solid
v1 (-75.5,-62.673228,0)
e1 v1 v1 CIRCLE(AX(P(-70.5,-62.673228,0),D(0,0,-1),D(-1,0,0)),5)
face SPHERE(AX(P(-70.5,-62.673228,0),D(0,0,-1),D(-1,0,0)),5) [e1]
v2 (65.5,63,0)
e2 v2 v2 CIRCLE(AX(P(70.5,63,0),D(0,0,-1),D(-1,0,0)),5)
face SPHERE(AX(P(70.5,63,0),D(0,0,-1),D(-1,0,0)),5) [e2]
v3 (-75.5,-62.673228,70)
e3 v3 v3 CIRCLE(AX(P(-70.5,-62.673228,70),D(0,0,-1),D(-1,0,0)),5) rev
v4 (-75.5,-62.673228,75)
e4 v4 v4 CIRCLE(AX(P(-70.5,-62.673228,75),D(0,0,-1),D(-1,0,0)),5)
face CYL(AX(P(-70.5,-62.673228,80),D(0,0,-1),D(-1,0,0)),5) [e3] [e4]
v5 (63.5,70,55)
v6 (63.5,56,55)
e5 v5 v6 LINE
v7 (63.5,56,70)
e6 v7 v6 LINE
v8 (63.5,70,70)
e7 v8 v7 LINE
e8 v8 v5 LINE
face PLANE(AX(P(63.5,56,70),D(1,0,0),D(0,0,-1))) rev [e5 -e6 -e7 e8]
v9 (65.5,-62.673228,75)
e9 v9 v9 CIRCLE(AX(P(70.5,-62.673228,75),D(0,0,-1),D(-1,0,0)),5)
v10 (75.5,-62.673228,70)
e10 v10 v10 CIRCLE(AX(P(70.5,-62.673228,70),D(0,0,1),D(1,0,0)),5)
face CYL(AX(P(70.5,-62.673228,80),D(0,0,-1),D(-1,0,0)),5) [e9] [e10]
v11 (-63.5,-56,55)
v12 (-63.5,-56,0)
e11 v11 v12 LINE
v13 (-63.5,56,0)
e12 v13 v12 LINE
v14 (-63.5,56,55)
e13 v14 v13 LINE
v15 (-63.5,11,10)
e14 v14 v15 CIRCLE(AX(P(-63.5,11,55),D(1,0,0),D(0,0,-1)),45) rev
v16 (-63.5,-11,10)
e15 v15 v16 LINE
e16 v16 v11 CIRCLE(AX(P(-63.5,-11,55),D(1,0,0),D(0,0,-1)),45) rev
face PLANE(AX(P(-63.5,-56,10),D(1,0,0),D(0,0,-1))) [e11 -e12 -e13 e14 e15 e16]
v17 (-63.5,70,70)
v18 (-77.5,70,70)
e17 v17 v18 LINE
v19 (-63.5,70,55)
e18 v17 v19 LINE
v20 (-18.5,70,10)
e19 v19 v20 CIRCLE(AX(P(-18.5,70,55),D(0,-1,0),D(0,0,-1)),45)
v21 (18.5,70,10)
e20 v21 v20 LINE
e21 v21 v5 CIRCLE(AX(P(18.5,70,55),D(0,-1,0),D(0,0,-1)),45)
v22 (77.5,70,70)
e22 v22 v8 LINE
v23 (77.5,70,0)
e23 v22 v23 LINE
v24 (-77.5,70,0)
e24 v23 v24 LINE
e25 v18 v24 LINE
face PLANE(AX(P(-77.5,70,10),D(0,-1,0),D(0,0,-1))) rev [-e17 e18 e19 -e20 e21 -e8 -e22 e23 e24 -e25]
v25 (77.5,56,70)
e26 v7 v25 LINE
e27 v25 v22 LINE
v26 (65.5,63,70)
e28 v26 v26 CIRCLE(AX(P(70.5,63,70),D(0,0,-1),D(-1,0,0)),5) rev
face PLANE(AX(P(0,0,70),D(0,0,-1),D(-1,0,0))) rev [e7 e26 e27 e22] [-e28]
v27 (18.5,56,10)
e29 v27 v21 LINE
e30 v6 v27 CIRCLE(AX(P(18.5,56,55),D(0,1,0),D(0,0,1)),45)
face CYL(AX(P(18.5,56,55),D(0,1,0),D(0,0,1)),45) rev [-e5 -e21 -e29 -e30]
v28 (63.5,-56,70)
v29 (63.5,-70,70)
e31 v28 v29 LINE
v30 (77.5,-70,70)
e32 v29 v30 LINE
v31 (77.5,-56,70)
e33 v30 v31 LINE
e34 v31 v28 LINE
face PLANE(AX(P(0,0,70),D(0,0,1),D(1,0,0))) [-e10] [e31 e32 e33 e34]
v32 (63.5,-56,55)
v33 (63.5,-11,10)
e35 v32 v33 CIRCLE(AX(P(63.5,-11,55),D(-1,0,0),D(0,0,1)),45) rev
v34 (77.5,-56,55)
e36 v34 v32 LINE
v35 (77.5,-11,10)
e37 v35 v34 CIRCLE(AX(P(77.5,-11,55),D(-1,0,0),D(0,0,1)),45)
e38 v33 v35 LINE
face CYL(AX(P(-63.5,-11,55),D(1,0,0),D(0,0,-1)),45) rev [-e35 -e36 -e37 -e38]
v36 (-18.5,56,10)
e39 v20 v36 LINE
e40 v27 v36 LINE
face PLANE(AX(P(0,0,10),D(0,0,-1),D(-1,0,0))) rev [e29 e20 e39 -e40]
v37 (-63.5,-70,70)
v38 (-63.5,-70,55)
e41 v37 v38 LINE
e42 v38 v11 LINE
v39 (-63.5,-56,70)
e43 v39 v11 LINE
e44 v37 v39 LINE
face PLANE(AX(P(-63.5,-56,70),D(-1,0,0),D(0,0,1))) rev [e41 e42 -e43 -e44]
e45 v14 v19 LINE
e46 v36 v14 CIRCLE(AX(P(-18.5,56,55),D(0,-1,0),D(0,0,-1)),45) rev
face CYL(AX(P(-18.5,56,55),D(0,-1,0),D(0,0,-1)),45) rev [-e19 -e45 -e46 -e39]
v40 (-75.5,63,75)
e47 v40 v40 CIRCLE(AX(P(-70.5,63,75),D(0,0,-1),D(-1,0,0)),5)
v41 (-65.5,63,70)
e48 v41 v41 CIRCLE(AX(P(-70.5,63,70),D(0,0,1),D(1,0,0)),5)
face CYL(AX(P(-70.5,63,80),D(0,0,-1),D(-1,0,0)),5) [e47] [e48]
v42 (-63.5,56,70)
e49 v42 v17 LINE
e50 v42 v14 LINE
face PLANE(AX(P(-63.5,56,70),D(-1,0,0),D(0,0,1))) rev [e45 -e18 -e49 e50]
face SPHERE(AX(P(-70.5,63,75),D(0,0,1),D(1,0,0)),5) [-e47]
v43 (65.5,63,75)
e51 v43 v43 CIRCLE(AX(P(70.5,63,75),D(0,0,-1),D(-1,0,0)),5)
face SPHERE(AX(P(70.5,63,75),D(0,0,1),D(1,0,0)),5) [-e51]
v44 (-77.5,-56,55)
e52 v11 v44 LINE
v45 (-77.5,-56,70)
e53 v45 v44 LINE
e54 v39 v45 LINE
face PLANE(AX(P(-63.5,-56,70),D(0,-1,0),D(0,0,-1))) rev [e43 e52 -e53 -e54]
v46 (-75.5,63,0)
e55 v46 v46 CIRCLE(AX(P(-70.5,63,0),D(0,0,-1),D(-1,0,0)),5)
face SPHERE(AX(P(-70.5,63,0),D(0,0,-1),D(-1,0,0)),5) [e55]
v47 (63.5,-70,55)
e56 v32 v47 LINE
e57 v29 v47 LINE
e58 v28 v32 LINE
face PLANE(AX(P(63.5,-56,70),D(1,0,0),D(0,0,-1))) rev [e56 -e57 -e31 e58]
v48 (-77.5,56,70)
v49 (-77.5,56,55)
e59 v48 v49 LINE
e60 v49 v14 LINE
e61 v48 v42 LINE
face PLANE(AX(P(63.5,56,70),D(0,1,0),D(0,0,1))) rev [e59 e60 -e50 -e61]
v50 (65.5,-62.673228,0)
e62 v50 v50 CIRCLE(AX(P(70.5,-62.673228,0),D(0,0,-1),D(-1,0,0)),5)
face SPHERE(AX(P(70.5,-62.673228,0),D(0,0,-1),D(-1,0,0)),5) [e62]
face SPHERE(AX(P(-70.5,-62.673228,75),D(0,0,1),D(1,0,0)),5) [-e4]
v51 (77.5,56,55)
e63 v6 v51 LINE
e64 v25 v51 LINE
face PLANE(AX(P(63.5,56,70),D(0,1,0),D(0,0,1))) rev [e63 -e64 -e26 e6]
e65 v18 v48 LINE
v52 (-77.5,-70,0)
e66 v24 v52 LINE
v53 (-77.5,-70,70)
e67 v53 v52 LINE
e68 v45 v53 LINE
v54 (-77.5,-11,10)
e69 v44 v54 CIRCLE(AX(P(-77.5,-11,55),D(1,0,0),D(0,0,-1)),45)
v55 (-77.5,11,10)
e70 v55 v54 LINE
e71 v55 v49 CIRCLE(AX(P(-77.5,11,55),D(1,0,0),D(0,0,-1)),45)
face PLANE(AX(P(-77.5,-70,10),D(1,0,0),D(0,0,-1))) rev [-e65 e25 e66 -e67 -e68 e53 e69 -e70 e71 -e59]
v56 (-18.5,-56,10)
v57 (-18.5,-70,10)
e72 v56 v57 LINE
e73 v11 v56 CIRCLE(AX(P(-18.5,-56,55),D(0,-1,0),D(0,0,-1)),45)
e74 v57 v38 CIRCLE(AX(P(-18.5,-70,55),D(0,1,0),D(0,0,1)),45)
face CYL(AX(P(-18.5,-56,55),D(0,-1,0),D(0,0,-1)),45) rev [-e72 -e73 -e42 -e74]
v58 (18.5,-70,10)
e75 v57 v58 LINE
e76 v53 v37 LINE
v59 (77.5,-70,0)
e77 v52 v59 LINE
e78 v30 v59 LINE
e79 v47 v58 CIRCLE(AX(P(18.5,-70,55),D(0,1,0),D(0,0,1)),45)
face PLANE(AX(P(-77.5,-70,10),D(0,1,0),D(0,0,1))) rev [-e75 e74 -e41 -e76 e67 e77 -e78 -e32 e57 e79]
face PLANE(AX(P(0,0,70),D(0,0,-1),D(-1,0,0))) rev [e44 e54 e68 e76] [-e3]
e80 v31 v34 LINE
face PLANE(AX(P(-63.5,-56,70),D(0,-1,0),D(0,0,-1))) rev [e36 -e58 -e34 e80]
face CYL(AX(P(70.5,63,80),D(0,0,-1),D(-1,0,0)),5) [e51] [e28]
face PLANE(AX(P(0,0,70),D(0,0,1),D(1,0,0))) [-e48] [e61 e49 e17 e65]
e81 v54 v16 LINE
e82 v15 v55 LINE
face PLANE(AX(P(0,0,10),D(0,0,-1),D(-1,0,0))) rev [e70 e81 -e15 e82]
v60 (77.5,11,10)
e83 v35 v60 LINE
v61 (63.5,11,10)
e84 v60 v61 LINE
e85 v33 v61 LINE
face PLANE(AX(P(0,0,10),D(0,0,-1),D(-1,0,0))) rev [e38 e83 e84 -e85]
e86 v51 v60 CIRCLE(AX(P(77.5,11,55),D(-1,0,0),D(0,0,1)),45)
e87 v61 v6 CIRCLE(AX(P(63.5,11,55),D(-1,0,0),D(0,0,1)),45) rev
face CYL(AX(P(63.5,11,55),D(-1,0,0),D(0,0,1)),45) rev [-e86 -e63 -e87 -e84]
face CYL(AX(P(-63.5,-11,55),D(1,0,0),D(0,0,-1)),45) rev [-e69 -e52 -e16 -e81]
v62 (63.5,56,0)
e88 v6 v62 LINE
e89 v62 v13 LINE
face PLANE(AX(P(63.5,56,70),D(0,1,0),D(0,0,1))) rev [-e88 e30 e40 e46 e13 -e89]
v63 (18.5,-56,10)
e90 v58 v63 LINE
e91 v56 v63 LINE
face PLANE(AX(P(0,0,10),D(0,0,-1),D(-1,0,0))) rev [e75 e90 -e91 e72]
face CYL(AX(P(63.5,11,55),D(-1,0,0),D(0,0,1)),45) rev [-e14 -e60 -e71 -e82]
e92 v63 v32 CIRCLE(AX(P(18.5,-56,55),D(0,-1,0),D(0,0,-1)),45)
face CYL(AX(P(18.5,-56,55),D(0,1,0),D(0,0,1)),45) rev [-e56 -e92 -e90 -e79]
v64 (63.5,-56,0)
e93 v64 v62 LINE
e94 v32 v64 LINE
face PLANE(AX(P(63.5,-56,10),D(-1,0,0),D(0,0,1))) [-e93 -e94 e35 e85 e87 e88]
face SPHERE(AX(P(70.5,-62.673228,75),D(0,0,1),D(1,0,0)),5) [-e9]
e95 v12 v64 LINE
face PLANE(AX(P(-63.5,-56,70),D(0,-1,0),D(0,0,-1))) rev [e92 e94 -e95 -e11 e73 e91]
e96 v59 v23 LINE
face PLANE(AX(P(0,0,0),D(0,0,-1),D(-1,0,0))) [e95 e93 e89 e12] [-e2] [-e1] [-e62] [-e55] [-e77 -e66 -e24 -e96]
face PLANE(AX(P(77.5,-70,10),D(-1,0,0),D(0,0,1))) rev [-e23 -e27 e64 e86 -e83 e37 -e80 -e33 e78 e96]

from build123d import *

# Parameters (mm, degrees)
SKIZZE1_W                       = 155
SKIZZE1_H                       = 140
SKIZZE1_W_2                     = 127
SKIZZE1_H_2                     = 112
AUFSATZ_LINEAR_AUSTRAGEN1_DEPTH = 10
SKIZZE2_W                       = 14
SKIZZE2_H                       = 14
AUFSATZ_LINEAR_AUSTRAGEN2_DEPTH = 60
SKIZZE3_R                       = 5
AUFSATZ_LINEAR_AUSTRAGEN3_DEPTH = 10
VERRUNDUNG1_R                   = 5
VERRUNDUNG3_R                   = 45
VERRUNDUNG4_R                   = 45
VERRUNDUNG6_R                   = 45
VERRUNDUNG7_R                   = 45
AUFSATZ_LINEAR_START            = 5
SKIZZE9_R                       = 5
AUFSATZ_LINEAR_AUSTRAGEN4_DEPTH = 5
VERRUNDUNG8_R                   = 5


# Some blends are built 0.0001 mm under size
with BuildPart() as part:
    # Skizze1 → Aufsatz-Linear austragen1 (new body)
    with BuildSketch(Plane.XY):
        Rectangle(SKIZZE1_W, SKIZZE1_H)
        Rectangle(SKIZZE1_W_2, SKIZZE1_H_2, mode=Mode.SUBTRACT)
    extrude(amount=AUFSATZ_LINEAR_AUSTRAGEN1_DEPTH)

    # Skizze2 → Aufsatz-Linear austragen2 (add)
    with BuildSketch(Plane.XY.offset(10)):
        with Locations((-70.5, 63)):
            Rectangle(SKIZZE2_W, SKIZZE2_H)
        with Locations((70.5, 63)):
            Rectangle(SKIZZE2_W, SKIZZE2_H)
        with Locations((70.5, -63)):
            Rectangle(SKIZZE2_W, SKIZZE2_H)
        with Locations((-70.5, -63)):
            Rectangle(SKIZZE2_W, SKIZZE2_H)
    extrude(amount=AUFSATZ_LINEAR_AUSTRAGEN2_DEPTH)

    # Skizze3 → Aufsatz-Linear austragen3 (add)
    with BuildSketch(Plane.XY.offset(70)):
        with Locations(Location((-70.5, -62.673227844, 0), (0, 0, 180))):
            Circle(SKIZZE3_R)
        with Locations((70.5, -62.673227844)):
            Circle(SKIZZE3_R)
        with Locations(Location((70.5, 63, 0), (0, 0, 180))):
            Circle(SKIZZE3_R)
        with Locations((-70.5, 63)):
            Circle(SKIZZE3_R)
    extrude(amount=AUFSATZ_LINEAR_AUSTRAGEN3_DEPTH)

    # Verrundung1
    verrundung1_edges = [part.edges().sort_by_distance(p)[0] for p in [
        (-65.5, -62.673227844, 80),
        (65.5, -62.673227844, 80),
        (75.5, 63, 80),
        (-75.5, 63, 80),
    ]]
    fillet(verrundung1_edges, radius=VERRUNDUNG1_R)

    # Verrundung3
    # the kernel refuses this fillet: 45 mm, written as the material it adds along each edge
    with BuildSketch(Plane(origin=(-63.5, -70, 10), x_dir=(0, 0, 1), z_dir=(0, 1, 0))) as verrundung3_piece_1:
        with BuildLine():
            CenterArc((VERRUNDUNG3_R, VERRUNDUNG3_R), VERRUNDUNG3_R, 180, 90)
            Line((0, VERRUNDUNG3_R), (0, 0))
            Line((0, 0), (VERRUNDUNG3_R, 0))
        make_face()
    extrude(amount=14)

    # Verrundung4
    verrundung4_edges = [part.edges().sort_by_distance(p)[0] for p in [
        (-70.5, -56, 10),
    ]]
    fillet(verrundung4_edges, radius=VERRUNDUNG4_R - 0.0001)  # a hair under: the kernel refuses the full size

    # Verrundung6
    # the kernel refuses this fillet: 45 mm, written as the material it adds along each edge
    with BuildSketch(Plane(origin=(-63.5, 70, 10), x_dir=(0, 0, 1), z_dir=(0, -1, 0)), Plane(origin=(63.5, 70, 10), x_dir=(-1, 0, 0), z_dir=(0, -1, 0)), Plane(origin=(63.5, -70, 10), x_dir=(0, 0, 1), z_dir=(0, 1, 0))) as verrundung6_piece_1:
        with BuildLine():
            CenterArc((VERRUNDUNG6_R, -VERRUNDUNG6_R), VERRUNDUNG6_R, 90, 90)
            Line((0, -VERRUNDUNG6_R), (0, 0))
            Line((0, 0), (VERRUNDUNG6_R, 0))
        make_face()
    extrude(amount=14)
    with BuildSketch(Plane(origin=(-63.5, 70, 10), x_dir=(0, 0, 1), z_dir=(0, -1, 0))) as verrundung6_piece_2_section:
        with BuildLine():
            CenterArc((VERRUNDUNG6_R, -VERRUNDUNG6_R), VERRUNDUNG6_R, 90, 90)
            Line((0, -VERRUNDUNG6_R), (0, 0))
            Line((0, 0), (VERRUNDUNG6_R, 0))
        make_face()
    verrundung6_piece_2 = extrude(amount=126.5, mode=Mode.PRIVATE)
    verrundung6_piece_2 = split(verrundung6_piece_2, bisect_by=Plane(origin=(-53.312219858, -56, 20.187780141), z_dir=(0, -1, 0)), keep=Keep.TOP, mode=Mode.PRIVATE)
    add(verrundung6_piece_2)
    with BuildSketch(Plane(origin=(63.5, 70, 10), x_dir=(-1, 0, 0), z_dir=(0, -1, 0))) as verrundung6_piece_3_section:
        with BuildLine():
            CenterArc((VERRUNDUNG6_R, -VERRUNDUNG6_R), VERRUNDUNG6_R, 90, 90)
            Line((0, -VERRUNDUNG6_R), (0, 0))
            Line((0, 0), (VERRUNDUNG6_R, 0))
        make_face()
    verrundung6_piece_3 = extrude(amount=126.5, mode=Mode.PRIVATE)
    verrundung6_piece_3 = split(verrundung6_piece_3, bisect_by=Plane(origin=(53.312219858, -56, 20.187780142), z_dir=(0, -1, 0)), keep=Keep.TOP, mode=Mode.PRIVATE)
    add(verrundung6_piece_3)
    with BuildSketch(Plane(origin=(63.5, -70, 10), x_dir=(0, 0, 1), z_dir=(0, 1, 0))) as verrundung6_piece_4_section:
        with BuildLine():
            CenterArc((VERRUNDUNG6_R, -VERRUNDUNG6_R), VERRUNDUNG6_R, 90, 90)
            Line((0, -VERRUNDUNG6_R), (0, 0))
            Line((0, 0), (VERRUNDUNG6_R, 0))
        make_face()
    verrundung6_piece_4 = extrude(amount=126.5, mode=Mode.PRIVATE)
    verrundung6_piece_4 = split(verrundung6_piece_4, bisect_by=Plane(origin=(53.312219858, 56, 20.187780142), z_dir=(0, 1, 0)), keep=Keep.TOP, mode=Mode.PRIVATE)
    add(verrundung6_piece_4)

    # Verrundung7
    verrundung7_edges = [part.edges().sort_by_distance(p)[0] for p in [
        (-70.5, 56, 10),
        (70.5, 56, 10),
        (70.5, -56, 10),
    ]]
    fillet(verrundung7_edges, radius=VERRUNDUNG7_R)

    # Skizze9 → Aufsatz-Linear austragen4 (add)
    with BuildSketch(Plane(origin=(0, 0, 0), x_dir=(-1, 0, 0), z_dir=(0, 0, -1)).offset(AUFSATZ_LINEAR_START)):
        with Locations((70.5, -62.673227844)):
            Circle(SKIZZE9_R)
        with Locations((70.5, 63)):
            Circle(SKIZZE9_R)
        with Locations((-70.5, 63)):
            Circle(SKIZZE9_R)
        with Locations((-70.5, -62.673227844)):
            Circle(SKIZZE9_R)
    extrude(amount=-AUFSATZ_LINEAR_AUSTRAGEN4_DEPTH)

    # Verrundung8
    verrundung8_edges = [part.edges().sort_by_distance(p)[0] for p in [
        (-65.5, -62.673227844, -5),
        (-65.5, 63, -5),
        (75.5, 63, -5),
        (75.5, -62.673227844, -5),
    ]]
    fillet(verrundung8_edges, radius=VERRUNDUNG8_R - 0.0001)  # a hair under: the kernel refuses the full size


solid = part.part
